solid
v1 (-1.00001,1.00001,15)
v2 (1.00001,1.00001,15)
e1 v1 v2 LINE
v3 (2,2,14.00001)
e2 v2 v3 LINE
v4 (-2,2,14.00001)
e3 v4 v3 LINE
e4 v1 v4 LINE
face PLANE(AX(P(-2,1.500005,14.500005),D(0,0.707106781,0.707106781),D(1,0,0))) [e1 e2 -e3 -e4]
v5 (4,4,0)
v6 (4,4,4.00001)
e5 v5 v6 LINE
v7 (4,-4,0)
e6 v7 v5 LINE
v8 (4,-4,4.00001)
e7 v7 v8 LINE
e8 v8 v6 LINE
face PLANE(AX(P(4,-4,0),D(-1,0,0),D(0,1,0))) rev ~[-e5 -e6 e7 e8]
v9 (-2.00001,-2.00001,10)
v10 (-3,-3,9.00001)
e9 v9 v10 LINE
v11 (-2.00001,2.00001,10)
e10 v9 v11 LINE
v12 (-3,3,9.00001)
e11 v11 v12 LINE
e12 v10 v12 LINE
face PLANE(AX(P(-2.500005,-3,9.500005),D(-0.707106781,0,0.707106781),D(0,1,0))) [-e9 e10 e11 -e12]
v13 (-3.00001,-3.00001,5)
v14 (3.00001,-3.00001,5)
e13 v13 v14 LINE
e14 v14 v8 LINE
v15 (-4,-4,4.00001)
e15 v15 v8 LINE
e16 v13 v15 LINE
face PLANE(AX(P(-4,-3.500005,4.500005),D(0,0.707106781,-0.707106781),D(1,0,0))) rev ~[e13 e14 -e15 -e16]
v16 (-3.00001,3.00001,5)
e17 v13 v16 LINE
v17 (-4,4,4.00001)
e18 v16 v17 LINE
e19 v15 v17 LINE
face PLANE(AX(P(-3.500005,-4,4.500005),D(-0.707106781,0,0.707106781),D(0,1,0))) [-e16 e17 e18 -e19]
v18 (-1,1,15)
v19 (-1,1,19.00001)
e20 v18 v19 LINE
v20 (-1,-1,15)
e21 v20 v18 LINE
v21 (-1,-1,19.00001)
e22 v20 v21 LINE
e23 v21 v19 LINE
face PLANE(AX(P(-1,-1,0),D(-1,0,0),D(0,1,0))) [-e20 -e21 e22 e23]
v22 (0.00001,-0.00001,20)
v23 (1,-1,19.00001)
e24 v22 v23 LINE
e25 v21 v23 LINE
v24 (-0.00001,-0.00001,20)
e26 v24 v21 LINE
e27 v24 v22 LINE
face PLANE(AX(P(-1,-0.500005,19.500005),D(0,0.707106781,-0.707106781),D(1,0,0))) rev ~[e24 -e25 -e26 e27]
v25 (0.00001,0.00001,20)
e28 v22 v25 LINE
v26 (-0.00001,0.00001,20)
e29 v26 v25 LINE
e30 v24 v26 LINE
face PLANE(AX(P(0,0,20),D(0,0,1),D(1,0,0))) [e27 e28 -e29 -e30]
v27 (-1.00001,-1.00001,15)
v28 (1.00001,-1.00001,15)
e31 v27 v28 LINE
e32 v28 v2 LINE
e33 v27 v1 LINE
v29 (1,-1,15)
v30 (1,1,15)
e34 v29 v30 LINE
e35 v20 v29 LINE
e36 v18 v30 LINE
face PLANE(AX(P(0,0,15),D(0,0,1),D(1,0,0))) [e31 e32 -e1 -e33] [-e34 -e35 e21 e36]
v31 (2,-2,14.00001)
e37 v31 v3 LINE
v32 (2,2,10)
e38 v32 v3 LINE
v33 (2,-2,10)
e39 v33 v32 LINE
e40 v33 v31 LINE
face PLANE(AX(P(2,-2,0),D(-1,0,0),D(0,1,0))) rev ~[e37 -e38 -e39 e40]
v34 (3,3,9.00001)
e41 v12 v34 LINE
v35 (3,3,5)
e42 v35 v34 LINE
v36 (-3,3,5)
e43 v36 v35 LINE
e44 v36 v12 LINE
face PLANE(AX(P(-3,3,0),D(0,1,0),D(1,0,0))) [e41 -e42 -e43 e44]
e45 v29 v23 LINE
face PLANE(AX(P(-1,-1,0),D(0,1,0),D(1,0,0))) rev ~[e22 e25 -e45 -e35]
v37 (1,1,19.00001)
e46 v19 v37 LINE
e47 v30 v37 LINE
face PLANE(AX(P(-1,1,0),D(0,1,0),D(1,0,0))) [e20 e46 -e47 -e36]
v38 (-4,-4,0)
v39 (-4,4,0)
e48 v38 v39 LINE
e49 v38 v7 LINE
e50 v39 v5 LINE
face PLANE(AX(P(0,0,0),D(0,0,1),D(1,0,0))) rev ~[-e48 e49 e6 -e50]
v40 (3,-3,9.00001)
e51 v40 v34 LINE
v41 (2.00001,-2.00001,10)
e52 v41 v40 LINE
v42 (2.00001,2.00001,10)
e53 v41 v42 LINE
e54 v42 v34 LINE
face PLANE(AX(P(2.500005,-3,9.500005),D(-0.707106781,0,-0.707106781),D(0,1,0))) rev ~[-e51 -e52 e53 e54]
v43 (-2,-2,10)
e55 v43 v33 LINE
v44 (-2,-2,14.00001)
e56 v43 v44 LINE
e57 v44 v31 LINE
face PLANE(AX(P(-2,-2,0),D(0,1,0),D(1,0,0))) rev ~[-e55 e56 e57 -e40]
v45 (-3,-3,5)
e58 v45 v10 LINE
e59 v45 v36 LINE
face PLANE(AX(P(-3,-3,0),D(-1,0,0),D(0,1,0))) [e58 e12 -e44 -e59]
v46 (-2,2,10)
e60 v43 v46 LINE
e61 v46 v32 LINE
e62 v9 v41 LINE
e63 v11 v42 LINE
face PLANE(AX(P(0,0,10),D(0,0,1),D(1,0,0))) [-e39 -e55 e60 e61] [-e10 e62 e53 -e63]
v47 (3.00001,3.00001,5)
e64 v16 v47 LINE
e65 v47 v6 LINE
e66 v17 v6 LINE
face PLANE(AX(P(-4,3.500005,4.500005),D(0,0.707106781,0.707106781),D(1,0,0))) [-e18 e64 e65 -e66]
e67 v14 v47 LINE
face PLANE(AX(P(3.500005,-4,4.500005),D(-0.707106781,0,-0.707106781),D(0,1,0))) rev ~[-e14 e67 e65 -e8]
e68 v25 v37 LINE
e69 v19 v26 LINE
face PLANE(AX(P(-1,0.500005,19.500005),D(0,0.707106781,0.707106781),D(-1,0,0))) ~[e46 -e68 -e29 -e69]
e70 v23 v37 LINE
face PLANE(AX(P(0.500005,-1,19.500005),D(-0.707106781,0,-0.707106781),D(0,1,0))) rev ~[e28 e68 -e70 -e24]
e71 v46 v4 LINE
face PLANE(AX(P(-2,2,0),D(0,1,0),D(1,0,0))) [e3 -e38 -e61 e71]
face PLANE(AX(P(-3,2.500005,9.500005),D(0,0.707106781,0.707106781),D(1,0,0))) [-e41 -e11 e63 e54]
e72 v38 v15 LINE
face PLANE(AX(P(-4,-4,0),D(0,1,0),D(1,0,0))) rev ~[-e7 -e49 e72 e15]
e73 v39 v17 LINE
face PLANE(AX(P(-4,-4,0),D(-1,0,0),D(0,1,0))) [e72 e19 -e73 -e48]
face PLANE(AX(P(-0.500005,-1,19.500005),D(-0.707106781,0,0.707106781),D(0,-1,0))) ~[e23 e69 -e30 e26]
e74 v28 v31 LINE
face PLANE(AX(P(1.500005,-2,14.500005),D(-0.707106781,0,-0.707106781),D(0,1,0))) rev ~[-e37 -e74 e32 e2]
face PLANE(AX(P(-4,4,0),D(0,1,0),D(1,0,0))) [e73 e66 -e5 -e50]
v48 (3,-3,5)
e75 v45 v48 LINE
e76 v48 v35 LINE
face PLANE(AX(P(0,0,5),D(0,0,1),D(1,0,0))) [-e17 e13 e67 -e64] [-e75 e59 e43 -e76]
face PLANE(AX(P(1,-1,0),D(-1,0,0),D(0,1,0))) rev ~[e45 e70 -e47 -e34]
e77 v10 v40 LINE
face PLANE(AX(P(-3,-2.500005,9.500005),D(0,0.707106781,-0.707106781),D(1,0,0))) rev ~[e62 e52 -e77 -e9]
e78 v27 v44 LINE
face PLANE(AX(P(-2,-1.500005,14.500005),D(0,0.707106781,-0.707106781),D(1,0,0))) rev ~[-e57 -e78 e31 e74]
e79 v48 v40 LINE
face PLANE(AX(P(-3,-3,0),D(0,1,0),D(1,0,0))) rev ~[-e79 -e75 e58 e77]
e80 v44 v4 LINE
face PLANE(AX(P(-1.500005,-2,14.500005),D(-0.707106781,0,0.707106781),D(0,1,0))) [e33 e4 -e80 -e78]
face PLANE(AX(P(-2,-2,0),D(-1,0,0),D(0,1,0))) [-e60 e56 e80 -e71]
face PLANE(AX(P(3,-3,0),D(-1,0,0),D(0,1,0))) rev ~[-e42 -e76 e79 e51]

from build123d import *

# Parameters (mm, degrees)
F0_W     = 8
F0_H     = 8
F0_W_2   = 6
F0_H_2   = 6
F1_DEPTH = 5
F0_W_3   = 4
F0_H_3   = 4
F2_DEPTH = 10
F0_W_4   = 2
F0_H_4   = 2
F3_DEPTH = 15
F4_DEPTH = 20
F5_SIZE  = 0.99999


# Not quite as in the source:
# - a fillet or chamfer is up to 0.001 mm smaller than in the source, because OpenCascade refuses the exact size


with BuildPart() as f1:
    # F0 (on Top) → F1 (new body)
    with BuildSketch(Plane.XY):
        Rectangle(F0_W, F0_H)
        Rectangle(F0_W_2, F0_H_2, mode=Mode.SUBTRACT)
    extrude(amount=F1_DEPTH)

    # F0 (on Top) → F2 (join)
    with BuildSketch(Plane.XY):
        Rectangle(F0_W_2, F0_H_2)
        Rectangle(F0_W_3, F0_H_3, mode=Mode.SUBTRACT)
    extrude(amount=F2_DEPTH)

    # F0 (on Top) → F3 (join)
    with BuildSketch(Plane.XY):
        Rectangle(F0_W_3, F0_H_3)
        Rectangle(F0_W_4, F0_H_4, mode=Mode.SUBTRACT)
    extrude(amount=F3_DEPTH)

    # F0 (on Top) → F4 (join)
    with BuildSketch(Plane.XY):
        Rectangle(F0_W_4, F0_H_4)
    extrude(amount=F4_DEPTH)

    # F5 (size 1 in the source; OpenCascade refuses exactly that, so slightly less here)
    f5_edges = [f1.edges().sort_by_distance(p)[0] for p in [
        (0, -4, 5),
        (4, 0, 5),
        (0, 4, 5),
        (-4, 0, 5),
        (0, -3, 10),
        (3, 0, 10),
        (-3, 0, 10),
        (0, 3, 10),
        (2, 0, 15),
        (0, -2, 15),
        (-2, 0, 15),
        (0, 2, 15),
        (1, 0, 20),
        (0, -1, 20),
        (-1, 0, 20),
        (0, 1, 20),
    ]]
    chamfer(f5_edges, length=F5_SIZE)


solid = f1.part
